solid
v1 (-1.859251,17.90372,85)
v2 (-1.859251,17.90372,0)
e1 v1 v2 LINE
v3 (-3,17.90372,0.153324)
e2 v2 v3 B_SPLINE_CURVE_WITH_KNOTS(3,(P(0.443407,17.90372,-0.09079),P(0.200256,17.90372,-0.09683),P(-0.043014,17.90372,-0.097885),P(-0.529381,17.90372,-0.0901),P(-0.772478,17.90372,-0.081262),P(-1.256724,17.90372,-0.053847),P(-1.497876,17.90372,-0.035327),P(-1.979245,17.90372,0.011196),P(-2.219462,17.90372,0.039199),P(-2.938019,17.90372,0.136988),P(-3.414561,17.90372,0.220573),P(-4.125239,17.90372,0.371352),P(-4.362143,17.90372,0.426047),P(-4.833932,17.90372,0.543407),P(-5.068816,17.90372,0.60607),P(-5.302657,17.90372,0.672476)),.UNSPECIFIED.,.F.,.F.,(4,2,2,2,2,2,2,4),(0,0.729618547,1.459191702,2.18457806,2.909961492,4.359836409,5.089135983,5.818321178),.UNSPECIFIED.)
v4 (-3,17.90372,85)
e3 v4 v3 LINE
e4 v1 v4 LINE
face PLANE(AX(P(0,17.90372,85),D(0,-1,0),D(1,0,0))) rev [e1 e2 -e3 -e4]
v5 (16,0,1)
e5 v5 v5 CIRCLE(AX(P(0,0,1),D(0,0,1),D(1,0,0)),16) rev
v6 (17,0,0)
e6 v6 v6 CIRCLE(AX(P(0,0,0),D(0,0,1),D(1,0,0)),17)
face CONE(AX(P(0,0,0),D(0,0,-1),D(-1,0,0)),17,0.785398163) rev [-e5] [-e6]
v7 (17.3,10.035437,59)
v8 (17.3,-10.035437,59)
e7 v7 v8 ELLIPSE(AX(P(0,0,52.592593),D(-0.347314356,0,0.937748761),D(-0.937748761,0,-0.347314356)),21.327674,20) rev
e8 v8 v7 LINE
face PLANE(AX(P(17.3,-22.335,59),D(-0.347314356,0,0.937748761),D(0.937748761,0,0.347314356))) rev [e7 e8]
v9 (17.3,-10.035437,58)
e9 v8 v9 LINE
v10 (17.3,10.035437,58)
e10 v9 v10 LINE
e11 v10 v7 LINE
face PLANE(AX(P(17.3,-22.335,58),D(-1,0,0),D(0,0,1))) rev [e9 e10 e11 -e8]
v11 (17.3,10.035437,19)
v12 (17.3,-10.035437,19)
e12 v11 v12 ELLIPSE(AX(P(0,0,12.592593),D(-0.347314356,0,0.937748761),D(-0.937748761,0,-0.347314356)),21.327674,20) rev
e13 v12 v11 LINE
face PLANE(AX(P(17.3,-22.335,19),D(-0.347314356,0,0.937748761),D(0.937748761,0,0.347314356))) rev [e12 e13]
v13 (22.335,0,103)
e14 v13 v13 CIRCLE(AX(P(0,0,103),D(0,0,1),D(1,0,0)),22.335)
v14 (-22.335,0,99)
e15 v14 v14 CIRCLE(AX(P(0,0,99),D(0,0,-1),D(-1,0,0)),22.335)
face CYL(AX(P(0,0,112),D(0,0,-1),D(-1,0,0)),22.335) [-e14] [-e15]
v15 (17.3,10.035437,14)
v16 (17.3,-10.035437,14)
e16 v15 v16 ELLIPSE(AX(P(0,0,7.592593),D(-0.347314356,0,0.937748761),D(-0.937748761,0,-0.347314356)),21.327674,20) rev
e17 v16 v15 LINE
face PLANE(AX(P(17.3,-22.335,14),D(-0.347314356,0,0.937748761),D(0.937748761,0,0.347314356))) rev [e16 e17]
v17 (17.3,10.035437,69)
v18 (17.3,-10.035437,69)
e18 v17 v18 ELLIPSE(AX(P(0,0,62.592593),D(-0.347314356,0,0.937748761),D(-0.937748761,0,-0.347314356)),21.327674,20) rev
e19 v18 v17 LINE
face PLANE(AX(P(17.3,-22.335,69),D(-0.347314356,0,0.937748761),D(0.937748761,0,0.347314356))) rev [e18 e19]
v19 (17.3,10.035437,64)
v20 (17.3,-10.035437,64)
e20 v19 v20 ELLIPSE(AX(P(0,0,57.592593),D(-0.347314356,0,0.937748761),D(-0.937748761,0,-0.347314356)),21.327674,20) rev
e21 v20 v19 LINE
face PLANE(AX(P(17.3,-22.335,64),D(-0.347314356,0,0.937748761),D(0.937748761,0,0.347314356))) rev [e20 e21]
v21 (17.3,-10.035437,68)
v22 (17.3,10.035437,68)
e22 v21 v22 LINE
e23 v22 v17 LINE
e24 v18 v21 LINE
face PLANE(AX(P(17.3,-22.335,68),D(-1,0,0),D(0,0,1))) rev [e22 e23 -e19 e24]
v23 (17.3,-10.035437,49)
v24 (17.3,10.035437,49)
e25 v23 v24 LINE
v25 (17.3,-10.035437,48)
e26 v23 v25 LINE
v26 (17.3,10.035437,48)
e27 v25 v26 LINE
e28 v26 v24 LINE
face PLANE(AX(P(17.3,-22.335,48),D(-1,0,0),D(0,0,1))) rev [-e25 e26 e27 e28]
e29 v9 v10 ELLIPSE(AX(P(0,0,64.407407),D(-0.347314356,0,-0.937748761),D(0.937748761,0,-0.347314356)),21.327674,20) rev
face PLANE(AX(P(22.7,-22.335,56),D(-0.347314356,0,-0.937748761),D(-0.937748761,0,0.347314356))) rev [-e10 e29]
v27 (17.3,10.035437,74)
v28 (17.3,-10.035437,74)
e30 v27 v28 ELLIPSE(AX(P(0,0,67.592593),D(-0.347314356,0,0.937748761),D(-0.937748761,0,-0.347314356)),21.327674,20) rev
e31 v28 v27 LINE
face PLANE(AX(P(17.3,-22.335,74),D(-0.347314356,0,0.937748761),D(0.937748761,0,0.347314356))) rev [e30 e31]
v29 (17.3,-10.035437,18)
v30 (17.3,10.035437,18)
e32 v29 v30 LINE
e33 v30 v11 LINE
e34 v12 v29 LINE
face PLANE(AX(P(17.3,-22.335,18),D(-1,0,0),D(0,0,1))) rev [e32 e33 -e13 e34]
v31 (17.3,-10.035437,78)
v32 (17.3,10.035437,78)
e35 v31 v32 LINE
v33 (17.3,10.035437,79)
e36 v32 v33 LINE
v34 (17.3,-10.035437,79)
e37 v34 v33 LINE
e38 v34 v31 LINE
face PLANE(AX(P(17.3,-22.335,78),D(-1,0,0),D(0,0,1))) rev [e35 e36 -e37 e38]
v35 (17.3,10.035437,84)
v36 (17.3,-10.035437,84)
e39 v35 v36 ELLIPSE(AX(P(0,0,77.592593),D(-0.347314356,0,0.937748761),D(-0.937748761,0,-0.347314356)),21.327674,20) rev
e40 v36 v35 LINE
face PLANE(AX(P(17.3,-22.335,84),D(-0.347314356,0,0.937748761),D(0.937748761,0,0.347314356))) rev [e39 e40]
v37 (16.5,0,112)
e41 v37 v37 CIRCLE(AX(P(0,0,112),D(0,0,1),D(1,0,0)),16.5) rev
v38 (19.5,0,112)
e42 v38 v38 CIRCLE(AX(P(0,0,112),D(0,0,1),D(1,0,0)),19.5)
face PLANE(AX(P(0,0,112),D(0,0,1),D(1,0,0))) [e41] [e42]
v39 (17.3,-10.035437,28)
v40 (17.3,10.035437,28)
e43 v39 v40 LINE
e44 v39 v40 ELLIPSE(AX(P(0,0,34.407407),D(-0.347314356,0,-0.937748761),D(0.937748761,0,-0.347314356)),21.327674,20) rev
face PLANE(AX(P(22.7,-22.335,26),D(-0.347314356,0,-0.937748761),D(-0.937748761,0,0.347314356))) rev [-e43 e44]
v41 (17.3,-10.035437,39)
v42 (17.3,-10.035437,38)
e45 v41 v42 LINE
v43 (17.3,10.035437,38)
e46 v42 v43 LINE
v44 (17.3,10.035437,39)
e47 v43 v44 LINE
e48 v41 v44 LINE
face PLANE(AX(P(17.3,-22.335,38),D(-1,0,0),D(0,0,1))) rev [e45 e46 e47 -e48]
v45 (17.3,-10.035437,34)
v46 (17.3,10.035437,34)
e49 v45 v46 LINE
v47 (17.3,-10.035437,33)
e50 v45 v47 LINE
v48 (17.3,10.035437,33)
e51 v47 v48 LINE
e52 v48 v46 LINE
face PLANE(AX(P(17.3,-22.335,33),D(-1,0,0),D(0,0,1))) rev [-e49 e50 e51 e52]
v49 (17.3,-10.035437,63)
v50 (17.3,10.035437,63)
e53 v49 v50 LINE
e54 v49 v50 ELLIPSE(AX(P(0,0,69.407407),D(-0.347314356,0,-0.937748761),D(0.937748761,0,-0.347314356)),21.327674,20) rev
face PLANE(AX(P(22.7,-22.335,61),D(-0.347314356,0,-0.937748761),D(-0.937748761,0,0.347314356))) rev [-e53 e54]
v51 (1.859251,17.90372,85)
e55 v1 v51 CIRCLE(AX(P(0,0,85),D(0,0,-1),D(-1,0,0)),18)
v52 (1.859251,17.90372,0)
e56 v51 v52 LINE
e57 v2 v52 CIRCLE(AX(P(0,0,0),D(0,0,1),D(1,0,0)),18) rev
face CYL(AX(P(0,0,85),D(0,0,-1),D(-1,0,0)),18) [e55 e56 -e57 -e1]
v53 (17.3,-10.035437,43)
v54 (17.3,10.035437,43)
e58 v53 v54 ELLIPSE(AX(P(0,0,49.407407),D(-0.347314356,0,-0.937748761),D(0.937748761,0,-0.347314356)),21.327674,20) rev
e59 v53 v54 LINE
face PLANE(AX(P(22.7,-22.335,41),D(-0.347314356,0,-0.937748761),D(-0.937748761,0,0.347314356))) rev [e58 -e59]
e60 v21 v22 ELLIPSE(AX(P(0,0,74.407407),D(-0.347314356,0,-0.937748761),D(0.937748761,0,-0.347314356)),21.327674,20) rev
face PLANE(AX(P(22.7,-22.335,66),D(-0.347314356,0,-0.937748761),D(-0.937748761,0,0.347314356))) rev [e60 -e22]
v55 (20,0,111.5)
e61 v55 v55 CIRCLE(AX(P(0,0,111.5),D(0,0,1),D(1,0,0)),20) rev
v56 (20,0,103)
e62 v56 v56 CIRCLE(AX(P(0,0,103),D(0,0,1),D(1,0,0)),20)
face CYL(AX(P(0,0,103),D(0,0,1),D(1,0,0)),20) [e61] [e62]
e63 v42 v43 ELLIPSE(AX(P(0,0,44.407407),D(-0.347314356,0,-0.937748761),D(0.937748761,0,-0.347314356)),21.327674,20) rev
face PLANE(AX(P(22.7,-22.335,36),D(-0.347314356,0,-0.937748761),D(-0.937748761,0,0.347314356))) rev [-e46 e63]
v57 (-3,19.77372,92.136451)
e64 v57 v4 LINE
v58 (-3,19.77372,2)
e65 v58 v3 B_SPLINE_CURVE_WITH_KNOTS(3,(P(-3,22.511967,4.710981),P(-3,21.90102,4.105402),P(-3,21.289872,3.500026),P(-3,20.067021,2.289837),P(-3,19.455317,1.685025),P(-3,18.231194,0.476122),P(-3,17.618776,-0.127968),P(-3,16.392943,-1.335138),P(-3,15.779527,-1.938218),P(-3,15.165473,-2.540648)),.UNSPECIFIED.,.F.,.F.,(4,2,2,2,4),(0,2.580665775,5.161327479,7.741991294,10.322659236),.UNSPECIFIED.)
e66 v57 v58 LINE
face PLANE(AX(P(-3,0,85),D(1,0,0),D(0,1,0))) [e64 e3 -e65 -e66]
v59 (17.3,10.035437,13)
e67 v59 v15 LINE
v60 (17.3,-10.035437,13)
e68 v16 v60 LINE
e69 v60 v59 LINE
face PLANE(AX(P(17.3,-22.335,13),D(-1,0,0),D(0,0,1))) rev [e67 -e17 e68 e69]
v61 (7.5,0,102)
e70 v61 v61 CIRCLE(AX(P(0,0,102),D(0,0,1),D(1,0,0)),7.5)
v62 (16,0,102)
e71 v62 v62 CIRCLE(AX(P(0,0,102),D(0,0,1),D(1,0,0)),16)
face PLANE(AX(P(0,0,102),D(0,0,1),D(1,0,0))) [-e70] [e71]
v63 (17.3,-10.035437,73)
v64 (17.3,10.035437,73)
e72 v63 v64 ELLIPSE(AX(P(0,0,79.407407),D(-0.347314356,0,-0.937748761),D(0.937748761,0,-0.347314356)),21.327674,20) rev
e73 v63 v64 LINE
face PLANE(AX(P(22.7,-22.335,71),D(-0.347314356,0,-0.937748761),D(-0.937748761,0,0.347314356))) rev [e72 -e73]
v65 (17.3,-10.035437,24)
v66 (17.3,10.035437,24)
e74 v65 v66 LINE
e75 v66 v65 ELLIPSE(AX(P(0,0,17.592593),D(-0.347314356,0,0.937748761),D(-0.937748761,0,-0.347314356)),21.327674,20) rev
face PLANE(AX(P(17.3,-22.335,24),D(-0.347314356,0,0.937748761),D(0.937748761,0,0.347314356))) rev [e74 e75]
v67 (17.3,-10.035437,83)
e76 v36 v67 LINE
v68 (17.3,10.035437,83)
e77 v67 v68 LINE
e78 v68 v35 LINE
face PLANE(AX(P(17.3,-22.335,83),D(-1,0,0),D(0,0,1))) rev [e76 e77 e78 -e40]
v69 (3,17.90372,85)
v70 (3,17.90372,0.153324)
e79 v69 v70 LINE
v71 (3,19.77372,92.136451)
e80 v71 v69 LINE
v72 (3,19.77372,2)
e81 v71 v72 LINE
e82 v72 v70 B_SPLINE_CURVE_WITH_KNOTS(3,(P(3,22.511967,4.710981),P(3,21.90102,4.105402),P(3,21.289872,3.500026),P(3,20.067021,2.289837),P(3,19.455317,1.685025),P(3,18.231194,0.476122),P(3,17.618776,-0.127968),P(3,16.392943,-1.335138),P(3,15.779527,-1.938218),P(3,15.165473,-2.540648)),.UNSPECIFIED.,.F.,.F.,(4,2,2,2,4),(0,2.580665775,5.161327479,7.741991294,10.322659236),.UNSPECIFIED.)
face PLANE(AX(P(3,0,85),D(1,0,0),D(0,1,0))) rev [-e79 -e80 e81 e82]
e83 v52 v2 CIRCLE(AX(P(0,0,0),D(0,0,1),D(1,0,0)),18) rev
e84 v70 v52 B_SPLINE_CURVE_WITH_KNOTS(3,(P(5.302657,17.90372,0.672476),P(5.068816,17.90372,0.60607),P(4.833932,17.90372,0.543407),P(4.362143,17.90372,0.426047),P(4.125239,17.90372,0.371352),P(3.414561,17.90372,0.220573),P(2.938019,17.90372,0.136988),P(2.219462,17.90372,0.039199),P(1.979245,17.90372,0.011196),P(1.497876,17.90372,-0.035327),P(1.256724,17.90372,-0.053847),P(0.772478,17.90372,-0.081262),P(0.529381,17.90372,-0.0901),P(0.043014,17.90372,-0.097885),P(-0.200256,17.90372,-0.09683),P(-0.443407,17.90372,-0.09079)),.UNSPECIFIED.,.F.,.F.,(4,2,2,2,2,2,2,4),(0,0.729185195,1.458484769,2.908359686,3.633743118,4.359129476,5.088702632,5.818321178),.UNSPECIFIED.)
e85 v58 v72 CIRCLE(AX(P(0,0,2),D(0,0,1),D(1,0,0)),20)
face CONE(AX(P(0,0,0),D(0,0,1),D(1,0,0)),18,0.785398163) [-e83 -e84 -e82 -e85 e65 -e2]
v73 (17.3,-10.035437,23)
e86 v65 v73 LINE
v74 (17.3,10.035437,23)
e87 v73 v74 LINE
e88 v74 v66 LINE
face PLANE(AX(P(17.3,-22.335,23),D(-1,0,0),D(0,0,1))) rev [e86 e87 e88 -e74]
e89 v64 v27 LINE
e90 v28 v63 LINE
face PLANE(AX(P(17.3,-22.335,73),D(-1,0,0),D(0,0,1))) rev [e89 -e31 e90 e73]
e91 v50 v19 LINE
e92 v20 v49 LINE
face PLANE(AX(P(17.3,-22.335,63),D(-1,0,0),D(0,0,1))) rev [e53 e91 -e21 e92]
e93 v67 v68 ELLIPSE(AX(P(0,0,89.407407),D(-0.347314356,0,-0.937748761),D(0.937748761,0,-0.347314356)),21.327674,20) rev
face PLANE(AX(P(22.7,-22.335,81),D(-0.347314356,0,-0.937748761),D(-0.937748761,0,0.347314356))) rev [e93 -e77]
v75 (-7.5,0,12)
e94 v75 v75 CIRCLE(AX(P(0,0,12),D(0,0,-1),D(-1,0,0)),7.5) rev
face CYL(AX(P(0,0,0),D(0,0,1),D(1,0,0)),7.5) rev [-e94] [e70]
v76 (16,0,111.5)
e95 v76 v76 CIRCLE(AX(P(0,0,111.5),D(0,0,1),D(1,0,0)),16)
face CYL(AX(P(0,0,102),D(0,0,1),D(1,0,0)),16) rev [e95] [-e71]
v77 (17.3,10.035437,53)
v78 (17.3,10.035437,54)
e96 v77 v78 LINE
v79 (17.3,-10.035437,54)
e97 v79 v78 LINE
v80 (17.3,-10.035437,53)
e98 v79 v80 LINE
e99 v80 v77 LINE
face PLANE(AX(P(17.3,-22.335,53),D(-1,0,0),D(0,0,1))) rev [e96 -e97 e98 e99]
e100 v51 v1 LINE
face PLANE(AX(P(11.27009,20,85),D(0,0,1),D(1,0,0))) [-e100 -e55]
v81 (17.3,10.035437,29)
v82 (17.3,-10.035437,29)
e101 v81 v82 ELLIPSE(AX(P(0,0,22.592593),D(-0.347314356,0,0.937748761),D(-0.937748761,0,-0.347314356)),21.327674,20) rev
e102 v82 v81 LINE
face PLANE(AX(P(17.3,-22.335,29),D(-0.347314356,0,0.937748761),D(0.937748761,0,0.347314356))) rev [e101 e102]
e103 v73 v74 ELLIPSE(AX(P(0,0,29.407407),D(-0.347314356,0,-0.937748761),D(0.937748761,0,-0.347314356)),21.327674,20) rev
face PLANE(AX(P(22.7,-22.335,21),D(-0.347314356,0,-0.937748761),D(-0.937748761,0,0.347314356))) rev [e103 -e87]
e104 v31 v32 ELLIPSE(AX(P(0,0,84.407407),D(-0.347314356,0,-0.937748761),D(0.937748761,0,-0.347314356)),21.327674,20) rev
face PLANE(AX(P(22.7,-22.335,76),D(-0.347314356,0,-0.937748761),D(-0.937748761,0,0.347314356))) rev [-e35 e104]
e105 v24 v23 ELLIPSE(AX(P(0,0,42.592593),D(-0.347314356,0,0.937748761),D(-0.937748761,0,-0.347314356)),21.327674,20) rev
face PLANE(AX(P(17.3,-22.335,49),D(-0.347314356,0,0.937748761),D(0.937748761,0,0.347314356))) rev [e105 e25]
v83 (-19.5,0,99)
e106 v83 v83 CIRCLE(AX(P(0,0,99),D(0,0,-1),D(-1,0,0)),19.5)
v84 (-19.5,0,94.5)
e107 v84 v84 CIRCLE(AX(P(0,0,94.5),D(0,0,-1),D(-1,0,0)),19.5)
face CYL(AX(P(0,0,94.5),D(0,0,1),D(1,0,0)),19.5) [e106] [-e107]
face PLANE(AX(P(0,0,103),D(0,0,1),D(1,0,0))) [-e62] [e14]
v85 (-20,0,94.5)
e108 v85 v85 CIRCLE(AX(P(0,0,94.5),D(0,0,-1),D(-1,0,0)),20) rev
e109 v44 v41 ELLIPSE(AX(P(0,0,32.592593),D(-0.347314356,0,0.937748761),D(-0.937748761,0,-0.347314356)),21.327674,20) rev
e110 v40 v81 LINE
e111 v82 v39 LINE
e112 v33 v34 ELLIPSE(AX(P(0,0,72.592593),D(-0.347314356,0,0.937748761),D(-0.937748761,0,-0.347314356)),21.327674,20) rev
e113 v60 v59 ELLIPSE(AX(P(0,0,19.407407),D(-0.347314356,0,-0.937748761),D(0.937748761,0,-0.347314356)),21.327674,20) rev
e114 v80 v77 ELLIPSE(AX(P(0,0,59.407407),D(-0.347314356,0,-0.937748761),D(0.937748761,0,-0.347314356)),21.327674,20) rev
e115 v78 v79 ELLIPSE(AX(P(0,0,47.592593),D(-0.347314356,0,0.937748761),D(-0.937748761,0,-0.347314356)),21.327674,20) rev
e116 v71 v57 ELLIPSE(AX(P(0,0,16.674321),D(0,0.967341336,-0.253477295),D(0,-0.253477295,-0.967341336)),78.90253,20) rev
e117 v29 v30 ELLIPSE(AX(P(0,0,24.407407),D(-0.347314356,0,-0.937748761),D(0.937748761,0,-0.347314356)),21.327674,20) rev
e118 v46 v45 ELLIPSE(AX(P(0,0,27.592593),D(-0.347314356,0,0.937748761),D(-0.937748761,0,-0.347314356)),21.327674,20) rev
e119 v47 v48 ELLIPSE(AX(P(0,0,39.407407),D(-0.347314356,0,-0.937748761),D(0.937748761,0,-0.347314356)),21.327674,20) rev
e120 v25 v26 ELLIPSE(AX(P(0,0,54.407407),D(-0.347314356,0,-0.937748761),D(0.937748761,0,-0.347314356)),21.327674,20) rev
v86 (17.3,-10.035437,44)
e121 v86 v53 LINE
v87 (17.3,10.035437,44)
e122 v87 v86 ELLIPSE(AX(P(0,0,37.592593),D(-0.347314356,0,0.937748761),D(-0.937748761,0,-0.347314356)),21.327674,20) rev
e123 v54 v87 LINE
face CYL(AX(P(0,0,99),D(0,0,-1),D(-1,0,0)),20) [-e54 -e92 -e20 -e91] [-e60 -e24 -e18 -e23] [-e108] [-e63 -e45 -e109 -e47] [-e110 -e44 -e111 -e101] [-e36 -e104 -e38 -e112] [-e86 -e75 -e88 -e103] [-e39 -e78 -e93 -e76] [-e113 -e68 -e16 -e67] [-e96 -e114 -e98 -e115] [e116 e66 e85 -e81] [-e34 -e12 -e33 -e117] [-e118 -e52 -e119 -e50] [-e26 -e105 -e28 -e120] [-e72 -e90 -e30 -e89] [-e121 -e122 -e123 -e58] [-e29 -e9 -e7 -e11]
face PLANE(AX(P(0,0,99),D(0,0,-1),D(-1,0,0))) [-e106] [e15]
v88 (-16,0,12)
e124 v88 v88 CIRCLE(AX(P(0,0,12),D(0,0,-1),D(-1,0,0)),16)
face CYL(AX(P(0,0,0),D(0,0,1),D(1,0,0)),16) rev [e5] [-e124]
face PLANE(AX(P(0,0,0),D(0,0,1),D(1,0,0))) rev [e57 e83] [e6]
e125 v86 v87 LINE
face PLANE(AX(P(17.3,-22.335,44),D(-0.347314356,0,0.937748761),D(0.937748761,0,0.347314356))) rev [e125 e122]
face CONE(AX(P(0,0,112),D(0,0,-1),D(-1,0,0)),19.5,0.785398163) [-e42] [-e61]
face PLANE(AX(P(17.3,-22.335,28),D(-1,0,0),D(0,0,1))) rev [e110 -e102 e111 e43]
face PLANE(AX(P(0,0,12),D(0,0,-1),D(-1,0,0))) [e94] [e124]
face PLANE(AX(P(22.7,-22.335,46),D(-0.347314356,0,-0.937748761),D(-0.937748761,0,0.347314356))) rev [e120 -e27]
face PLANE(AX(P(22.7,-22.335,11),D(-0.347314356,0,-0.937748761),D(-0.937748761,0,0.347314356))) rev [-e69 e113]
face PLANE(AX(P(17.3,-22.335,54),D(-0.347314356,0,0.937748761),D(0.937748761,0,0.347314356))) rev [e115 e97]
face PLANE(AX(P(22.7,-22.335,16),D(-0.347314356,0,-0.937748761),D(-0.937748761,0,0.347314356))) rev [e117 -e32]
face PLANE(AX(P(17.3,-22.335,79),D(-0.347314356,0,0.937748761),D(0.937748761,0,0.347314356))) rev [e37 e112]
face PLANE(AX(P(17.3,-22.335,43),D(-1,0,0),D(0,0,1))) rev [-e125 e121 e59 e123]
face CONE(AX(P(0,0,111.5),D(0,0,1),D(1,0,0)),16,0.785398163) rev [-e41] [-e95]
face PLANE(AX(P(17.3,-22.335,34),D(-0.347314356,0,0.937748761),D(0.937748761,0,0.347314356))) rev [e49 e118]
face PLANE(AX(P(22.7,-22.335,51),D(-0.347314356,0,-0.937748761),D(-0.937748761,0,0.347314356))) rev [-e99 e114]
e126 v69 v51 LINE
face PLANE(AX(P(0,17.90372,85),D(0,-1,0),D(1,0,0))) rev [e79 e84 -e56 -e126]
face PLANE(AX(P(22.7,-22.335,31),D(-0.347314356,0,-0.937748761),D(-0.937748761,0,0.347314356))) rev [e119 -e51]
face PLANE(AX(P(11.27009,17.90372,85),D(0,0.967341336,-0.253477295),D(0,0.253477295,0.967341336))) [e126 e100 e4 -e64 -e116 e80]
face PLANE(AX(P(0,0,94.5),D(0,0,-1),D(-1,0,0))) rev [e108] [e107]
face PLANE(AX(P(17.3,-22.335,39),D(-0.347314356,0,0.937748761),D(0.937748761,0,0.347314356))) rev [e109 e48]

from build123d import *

# Parameters (mm, degrees)
SKETCH1_R           = 22.335
BOSS_EXTRUDE1_DEPTH = 112
CUT_EXTRUDE1_START  = -9
SKETCH2_R           = 22.335
SKETCH2_R_2         = 20
CUT_EXTRUDE1_DEPTH  = 9
SKETCH3_R           = 22.335
SKETCH3_R_2         = 20
CUT_EXTRUDE2_DEPTH  = 99
CUT_EXTRUDE3_START  = 4.5
SKETCH4_R           = 22.335
SKETCH4_R_2         = 19.5
CUT_EXTRUDE3_DEPTH  = 4.5
SKETCH5_R           = 16
CUT_EXTRUDE4_DEPTH  = 10
CHAMFER1_SIZE       = 0.5
SKETCH6_R           = 7.5
CUT_EXTRUDE5_DEPTH  = 107.77876404
CUT_EXTRUDE6_START  = -92.45
SKETCH6_2_R         = 16
SKETCH6_2_R_2       = 7.5
CUT_EXTRUDE6_DEPTH  = 15.32876404
CHAMFER2_SIZE       = 2
CUT_EXTRUDE8_START  = -12
SKETCH8_R           = 16
CUT_EXTRUDE8_DEPTH  = 12
CHAMFER3_SIZE       = 1
CUT_EXTRUDE9_START  = -85
CUT_EXTRUDE9_DEPTH  = 85
CUT_EXTRUDE10_REACH = 118.982
CUT_EXTRUDE11_DEPTH = 117.368829375
LPATTERN1_COUNT     = 15
LPATTERN1_PITCH     = 5


# Read off the part's stored shape, not the designer's step: Cut-Extrude9
with BuildPart() as part:
    # Sketch1 → Boss-Extrude1 (new body)
    with BuildSketch(Plane.XY):
        Circle(SKETCH1_R)
    extrude(amount=BOSS_EXTRUDE1_DEPTH)

    # Sketch2 → Cut-Extrude1 (cut)
    with BuildSketch(Plane.XY.offset(112).offset(CUT_EXTRUDE1_START)):
        Circle(SKETCH2_R)
        Circle(SKETCH2_R_2, mode=Mode.SUBTRACT)
    extrude(amount=CUT_EXTRUDE1_DEPTH, mode=Mode.SUBTRACT)

    # Sketch3 → Cut-Extrude2 (cut)
    with BuildSketch(Plane(origin=(0, 0, 0), x_dir=(-1, 0, 0), z_dir=(0, 0, -1))):
        Circle(SKETCH3_R)
        with Locations(Location((0, 0, 0), (0, 0, 180))):
            Circle(SKETCH3_R_2, mode=Mode.SUBTRACT)
    extrude(amount=-CUT_EXTRUDE2_DEPTH, mode=Mode.SUBTRACT)

    # Sketch4 → Cut-Extrude3 (cut)
    with BuildSketch(Plane(origin=(0, 0, 99), x_dir=(-1, 0, 0), z_dir=(0, 0, -1)).offset(CUT_EXTRUDE3_START)):
        Circle(SKETCH4_R)
        Circle(SKETCH4_R_2, mode=Mode.SUBTRACT)
    extrude(amount=-CUT_EXTRUDE3_DEPTH, mode=Mode.SUBTRACT)

    # Sketch5 → Cut-Extrude4 (cut)
    with BuildSketch(Plane.XY.offset(112)):
        Circle(SKETCH5_R)
    extrude(amount=-CUT_EXTRUDE4_DEPTH, mode=Mode.SUBTRACT)

    # Chamfer1
    chamfer1_edges = [part.edges().sort_by_distance(p)[0] for p in [
        (-16, 0, 112),
        (-20, 0, 112),
    ]]
    chamfer(chamfer1_edges, length=CHAMFER1_SIZE)

    # Sketch6 → Cut-Extrude5 (cut, through all)
    with BuildSketch(Plane.XY.offset(102)):
        Circle(SKETCH6_R)
    extrude(amount=-CUT_EXTRUDE5_DEPTH, mode=Mode.SUBTRACT)

    # Sketch6<2> → Cut-Extrude6 (cut, through all)
    with BuildSketch(Plane.XY.offset(102).offset(CUT_EXTRUDE6_START)):
        Circle(SKETCH6_2_R)
        Circle(SKETCH6_2_R_2, mode=Mode.SUBTRACT)
    extrude(amount=-CUT_EXTRUDE6_DEPTH, mode=Mode.SUBTRACT)

    # Chamfer2
    chamfer2_edges = [part.edges().sort_by_distance(p)[0] for p in [
        (-20, 0, 0),
    ]]
    chamfer(chamfer2_edges, length=CHAMFER2_SIZE)

    # Sketch8 → Cut-Extrude8 (cut)
    with BuildSketch(Plane(origin=(0, 0, 0), x_dir=(-1, 0, 0), z_dir=(0, 0, -1)).offset(CUT_EXTRUDE8_START)):
        with Locations(Location((0, 0, 0), (0, 0, 180))):
            Circle(SKETCH8_R)
    extrude(amount=CUT_EXTRUDE8_DEPTH, mode=Mode.SUBTRACT)

    # Chamfer3
    chamfer3_edges = [part.edges().sort_by_distance(p)[0] for p in [
        (-16, 0, 0),
    ]]
    chamfer(chamfer3_edges, length=CHAMFER3_SIZE)

    # Cut-Extrude9 outline → Cut-Extrude9 (cut)
    with BuildSketch(Plane(origin=(0, 0, 0), x_dir=(-1, 0, 0), z_dir=(0, 0, -1)).offset(CUT_EXTRUDE9_START)):
        with BuildLine():
            Line((3, 17.903719933), (3, 19.773719933))
            ThreePointArc((3, 19.773719933), (0, 20), (-3, 19.773719933))
            Line((-3, 19.773719933), (-3, 17.903719933))
            Line((-3, 17.903719933), (-1.859250535, 17.903719933))
            ThreePointArc((-1.859250535, 17.903719933), (0, 18), (1.859250535, 17.903719933))
            Line((1.859250535, 17.903719933), (3, 17.903719933))
        make_face()
    extrude(amount=CUT_EXTRUDE9_DEPTH, mode=Mode.SUBTRACT)

    # Cut-Extrude10: up to this face of the body (flat: up to its plane)
    cut_extrude10_end = Plane(part.part.faces().sort_by_distance((3, 18.835290902, 43.036448518))[0])
    # Sketch11 → Cut-Extrude10 (cut, up to the picked face)
    with BuildSketch(Plane(origin=(-3, 0, 0), x_dir=(0, 0, -1), z_dir=(1, 0, 0)), mode=Mode.PRIVATE) as cut_extrude10_sk1:
        Polygon((-93, 20), (-85, 20), (-85, 17.903719933), align=None)
    cut_extrude10_tool1 = split(extrude(cut_extrude10_sk1.sketch, amount=CUT_EXTRUDE10_REACH, mode=Mode.PRIVATE), bisect_by=cut_extrude10_end, keep=Keep.BOTH, mode=Mode.PRIVATE)
    add(cut_extrude10_tool1.solids().sort_by(Axis((-3, 19.30124, 87.666667), (1, 0, 0)))[0], mode=Mode.SUBTRACT)

    # Sketch13 → Cut-Extrude11 (cut, symmetric)
    with BuildSketch(Plane(origin=(0, 0, 0), x_dir=(1, 0, 0), z_dir=(0, 1, 0))):
        Polygon((17.3, -83), (17.3, -84), (22.7, -86), (22.7, -81), align=None)
    cut_extrude11 = extrude(amount=CUT_EXTRUDE11_DEPTH, both=True, mode=Mode.SUBTRACT)

    # LPattern1: Cut-Extrude11 ×15
    with Locations(*[(0, 0, -i * LPATTERN1_PITCH) for i in range(1, LPATTERN1_COUNT)]):
        add(cut_extrude11, mode=Mode.SUBTRACT)


solid = part.part
